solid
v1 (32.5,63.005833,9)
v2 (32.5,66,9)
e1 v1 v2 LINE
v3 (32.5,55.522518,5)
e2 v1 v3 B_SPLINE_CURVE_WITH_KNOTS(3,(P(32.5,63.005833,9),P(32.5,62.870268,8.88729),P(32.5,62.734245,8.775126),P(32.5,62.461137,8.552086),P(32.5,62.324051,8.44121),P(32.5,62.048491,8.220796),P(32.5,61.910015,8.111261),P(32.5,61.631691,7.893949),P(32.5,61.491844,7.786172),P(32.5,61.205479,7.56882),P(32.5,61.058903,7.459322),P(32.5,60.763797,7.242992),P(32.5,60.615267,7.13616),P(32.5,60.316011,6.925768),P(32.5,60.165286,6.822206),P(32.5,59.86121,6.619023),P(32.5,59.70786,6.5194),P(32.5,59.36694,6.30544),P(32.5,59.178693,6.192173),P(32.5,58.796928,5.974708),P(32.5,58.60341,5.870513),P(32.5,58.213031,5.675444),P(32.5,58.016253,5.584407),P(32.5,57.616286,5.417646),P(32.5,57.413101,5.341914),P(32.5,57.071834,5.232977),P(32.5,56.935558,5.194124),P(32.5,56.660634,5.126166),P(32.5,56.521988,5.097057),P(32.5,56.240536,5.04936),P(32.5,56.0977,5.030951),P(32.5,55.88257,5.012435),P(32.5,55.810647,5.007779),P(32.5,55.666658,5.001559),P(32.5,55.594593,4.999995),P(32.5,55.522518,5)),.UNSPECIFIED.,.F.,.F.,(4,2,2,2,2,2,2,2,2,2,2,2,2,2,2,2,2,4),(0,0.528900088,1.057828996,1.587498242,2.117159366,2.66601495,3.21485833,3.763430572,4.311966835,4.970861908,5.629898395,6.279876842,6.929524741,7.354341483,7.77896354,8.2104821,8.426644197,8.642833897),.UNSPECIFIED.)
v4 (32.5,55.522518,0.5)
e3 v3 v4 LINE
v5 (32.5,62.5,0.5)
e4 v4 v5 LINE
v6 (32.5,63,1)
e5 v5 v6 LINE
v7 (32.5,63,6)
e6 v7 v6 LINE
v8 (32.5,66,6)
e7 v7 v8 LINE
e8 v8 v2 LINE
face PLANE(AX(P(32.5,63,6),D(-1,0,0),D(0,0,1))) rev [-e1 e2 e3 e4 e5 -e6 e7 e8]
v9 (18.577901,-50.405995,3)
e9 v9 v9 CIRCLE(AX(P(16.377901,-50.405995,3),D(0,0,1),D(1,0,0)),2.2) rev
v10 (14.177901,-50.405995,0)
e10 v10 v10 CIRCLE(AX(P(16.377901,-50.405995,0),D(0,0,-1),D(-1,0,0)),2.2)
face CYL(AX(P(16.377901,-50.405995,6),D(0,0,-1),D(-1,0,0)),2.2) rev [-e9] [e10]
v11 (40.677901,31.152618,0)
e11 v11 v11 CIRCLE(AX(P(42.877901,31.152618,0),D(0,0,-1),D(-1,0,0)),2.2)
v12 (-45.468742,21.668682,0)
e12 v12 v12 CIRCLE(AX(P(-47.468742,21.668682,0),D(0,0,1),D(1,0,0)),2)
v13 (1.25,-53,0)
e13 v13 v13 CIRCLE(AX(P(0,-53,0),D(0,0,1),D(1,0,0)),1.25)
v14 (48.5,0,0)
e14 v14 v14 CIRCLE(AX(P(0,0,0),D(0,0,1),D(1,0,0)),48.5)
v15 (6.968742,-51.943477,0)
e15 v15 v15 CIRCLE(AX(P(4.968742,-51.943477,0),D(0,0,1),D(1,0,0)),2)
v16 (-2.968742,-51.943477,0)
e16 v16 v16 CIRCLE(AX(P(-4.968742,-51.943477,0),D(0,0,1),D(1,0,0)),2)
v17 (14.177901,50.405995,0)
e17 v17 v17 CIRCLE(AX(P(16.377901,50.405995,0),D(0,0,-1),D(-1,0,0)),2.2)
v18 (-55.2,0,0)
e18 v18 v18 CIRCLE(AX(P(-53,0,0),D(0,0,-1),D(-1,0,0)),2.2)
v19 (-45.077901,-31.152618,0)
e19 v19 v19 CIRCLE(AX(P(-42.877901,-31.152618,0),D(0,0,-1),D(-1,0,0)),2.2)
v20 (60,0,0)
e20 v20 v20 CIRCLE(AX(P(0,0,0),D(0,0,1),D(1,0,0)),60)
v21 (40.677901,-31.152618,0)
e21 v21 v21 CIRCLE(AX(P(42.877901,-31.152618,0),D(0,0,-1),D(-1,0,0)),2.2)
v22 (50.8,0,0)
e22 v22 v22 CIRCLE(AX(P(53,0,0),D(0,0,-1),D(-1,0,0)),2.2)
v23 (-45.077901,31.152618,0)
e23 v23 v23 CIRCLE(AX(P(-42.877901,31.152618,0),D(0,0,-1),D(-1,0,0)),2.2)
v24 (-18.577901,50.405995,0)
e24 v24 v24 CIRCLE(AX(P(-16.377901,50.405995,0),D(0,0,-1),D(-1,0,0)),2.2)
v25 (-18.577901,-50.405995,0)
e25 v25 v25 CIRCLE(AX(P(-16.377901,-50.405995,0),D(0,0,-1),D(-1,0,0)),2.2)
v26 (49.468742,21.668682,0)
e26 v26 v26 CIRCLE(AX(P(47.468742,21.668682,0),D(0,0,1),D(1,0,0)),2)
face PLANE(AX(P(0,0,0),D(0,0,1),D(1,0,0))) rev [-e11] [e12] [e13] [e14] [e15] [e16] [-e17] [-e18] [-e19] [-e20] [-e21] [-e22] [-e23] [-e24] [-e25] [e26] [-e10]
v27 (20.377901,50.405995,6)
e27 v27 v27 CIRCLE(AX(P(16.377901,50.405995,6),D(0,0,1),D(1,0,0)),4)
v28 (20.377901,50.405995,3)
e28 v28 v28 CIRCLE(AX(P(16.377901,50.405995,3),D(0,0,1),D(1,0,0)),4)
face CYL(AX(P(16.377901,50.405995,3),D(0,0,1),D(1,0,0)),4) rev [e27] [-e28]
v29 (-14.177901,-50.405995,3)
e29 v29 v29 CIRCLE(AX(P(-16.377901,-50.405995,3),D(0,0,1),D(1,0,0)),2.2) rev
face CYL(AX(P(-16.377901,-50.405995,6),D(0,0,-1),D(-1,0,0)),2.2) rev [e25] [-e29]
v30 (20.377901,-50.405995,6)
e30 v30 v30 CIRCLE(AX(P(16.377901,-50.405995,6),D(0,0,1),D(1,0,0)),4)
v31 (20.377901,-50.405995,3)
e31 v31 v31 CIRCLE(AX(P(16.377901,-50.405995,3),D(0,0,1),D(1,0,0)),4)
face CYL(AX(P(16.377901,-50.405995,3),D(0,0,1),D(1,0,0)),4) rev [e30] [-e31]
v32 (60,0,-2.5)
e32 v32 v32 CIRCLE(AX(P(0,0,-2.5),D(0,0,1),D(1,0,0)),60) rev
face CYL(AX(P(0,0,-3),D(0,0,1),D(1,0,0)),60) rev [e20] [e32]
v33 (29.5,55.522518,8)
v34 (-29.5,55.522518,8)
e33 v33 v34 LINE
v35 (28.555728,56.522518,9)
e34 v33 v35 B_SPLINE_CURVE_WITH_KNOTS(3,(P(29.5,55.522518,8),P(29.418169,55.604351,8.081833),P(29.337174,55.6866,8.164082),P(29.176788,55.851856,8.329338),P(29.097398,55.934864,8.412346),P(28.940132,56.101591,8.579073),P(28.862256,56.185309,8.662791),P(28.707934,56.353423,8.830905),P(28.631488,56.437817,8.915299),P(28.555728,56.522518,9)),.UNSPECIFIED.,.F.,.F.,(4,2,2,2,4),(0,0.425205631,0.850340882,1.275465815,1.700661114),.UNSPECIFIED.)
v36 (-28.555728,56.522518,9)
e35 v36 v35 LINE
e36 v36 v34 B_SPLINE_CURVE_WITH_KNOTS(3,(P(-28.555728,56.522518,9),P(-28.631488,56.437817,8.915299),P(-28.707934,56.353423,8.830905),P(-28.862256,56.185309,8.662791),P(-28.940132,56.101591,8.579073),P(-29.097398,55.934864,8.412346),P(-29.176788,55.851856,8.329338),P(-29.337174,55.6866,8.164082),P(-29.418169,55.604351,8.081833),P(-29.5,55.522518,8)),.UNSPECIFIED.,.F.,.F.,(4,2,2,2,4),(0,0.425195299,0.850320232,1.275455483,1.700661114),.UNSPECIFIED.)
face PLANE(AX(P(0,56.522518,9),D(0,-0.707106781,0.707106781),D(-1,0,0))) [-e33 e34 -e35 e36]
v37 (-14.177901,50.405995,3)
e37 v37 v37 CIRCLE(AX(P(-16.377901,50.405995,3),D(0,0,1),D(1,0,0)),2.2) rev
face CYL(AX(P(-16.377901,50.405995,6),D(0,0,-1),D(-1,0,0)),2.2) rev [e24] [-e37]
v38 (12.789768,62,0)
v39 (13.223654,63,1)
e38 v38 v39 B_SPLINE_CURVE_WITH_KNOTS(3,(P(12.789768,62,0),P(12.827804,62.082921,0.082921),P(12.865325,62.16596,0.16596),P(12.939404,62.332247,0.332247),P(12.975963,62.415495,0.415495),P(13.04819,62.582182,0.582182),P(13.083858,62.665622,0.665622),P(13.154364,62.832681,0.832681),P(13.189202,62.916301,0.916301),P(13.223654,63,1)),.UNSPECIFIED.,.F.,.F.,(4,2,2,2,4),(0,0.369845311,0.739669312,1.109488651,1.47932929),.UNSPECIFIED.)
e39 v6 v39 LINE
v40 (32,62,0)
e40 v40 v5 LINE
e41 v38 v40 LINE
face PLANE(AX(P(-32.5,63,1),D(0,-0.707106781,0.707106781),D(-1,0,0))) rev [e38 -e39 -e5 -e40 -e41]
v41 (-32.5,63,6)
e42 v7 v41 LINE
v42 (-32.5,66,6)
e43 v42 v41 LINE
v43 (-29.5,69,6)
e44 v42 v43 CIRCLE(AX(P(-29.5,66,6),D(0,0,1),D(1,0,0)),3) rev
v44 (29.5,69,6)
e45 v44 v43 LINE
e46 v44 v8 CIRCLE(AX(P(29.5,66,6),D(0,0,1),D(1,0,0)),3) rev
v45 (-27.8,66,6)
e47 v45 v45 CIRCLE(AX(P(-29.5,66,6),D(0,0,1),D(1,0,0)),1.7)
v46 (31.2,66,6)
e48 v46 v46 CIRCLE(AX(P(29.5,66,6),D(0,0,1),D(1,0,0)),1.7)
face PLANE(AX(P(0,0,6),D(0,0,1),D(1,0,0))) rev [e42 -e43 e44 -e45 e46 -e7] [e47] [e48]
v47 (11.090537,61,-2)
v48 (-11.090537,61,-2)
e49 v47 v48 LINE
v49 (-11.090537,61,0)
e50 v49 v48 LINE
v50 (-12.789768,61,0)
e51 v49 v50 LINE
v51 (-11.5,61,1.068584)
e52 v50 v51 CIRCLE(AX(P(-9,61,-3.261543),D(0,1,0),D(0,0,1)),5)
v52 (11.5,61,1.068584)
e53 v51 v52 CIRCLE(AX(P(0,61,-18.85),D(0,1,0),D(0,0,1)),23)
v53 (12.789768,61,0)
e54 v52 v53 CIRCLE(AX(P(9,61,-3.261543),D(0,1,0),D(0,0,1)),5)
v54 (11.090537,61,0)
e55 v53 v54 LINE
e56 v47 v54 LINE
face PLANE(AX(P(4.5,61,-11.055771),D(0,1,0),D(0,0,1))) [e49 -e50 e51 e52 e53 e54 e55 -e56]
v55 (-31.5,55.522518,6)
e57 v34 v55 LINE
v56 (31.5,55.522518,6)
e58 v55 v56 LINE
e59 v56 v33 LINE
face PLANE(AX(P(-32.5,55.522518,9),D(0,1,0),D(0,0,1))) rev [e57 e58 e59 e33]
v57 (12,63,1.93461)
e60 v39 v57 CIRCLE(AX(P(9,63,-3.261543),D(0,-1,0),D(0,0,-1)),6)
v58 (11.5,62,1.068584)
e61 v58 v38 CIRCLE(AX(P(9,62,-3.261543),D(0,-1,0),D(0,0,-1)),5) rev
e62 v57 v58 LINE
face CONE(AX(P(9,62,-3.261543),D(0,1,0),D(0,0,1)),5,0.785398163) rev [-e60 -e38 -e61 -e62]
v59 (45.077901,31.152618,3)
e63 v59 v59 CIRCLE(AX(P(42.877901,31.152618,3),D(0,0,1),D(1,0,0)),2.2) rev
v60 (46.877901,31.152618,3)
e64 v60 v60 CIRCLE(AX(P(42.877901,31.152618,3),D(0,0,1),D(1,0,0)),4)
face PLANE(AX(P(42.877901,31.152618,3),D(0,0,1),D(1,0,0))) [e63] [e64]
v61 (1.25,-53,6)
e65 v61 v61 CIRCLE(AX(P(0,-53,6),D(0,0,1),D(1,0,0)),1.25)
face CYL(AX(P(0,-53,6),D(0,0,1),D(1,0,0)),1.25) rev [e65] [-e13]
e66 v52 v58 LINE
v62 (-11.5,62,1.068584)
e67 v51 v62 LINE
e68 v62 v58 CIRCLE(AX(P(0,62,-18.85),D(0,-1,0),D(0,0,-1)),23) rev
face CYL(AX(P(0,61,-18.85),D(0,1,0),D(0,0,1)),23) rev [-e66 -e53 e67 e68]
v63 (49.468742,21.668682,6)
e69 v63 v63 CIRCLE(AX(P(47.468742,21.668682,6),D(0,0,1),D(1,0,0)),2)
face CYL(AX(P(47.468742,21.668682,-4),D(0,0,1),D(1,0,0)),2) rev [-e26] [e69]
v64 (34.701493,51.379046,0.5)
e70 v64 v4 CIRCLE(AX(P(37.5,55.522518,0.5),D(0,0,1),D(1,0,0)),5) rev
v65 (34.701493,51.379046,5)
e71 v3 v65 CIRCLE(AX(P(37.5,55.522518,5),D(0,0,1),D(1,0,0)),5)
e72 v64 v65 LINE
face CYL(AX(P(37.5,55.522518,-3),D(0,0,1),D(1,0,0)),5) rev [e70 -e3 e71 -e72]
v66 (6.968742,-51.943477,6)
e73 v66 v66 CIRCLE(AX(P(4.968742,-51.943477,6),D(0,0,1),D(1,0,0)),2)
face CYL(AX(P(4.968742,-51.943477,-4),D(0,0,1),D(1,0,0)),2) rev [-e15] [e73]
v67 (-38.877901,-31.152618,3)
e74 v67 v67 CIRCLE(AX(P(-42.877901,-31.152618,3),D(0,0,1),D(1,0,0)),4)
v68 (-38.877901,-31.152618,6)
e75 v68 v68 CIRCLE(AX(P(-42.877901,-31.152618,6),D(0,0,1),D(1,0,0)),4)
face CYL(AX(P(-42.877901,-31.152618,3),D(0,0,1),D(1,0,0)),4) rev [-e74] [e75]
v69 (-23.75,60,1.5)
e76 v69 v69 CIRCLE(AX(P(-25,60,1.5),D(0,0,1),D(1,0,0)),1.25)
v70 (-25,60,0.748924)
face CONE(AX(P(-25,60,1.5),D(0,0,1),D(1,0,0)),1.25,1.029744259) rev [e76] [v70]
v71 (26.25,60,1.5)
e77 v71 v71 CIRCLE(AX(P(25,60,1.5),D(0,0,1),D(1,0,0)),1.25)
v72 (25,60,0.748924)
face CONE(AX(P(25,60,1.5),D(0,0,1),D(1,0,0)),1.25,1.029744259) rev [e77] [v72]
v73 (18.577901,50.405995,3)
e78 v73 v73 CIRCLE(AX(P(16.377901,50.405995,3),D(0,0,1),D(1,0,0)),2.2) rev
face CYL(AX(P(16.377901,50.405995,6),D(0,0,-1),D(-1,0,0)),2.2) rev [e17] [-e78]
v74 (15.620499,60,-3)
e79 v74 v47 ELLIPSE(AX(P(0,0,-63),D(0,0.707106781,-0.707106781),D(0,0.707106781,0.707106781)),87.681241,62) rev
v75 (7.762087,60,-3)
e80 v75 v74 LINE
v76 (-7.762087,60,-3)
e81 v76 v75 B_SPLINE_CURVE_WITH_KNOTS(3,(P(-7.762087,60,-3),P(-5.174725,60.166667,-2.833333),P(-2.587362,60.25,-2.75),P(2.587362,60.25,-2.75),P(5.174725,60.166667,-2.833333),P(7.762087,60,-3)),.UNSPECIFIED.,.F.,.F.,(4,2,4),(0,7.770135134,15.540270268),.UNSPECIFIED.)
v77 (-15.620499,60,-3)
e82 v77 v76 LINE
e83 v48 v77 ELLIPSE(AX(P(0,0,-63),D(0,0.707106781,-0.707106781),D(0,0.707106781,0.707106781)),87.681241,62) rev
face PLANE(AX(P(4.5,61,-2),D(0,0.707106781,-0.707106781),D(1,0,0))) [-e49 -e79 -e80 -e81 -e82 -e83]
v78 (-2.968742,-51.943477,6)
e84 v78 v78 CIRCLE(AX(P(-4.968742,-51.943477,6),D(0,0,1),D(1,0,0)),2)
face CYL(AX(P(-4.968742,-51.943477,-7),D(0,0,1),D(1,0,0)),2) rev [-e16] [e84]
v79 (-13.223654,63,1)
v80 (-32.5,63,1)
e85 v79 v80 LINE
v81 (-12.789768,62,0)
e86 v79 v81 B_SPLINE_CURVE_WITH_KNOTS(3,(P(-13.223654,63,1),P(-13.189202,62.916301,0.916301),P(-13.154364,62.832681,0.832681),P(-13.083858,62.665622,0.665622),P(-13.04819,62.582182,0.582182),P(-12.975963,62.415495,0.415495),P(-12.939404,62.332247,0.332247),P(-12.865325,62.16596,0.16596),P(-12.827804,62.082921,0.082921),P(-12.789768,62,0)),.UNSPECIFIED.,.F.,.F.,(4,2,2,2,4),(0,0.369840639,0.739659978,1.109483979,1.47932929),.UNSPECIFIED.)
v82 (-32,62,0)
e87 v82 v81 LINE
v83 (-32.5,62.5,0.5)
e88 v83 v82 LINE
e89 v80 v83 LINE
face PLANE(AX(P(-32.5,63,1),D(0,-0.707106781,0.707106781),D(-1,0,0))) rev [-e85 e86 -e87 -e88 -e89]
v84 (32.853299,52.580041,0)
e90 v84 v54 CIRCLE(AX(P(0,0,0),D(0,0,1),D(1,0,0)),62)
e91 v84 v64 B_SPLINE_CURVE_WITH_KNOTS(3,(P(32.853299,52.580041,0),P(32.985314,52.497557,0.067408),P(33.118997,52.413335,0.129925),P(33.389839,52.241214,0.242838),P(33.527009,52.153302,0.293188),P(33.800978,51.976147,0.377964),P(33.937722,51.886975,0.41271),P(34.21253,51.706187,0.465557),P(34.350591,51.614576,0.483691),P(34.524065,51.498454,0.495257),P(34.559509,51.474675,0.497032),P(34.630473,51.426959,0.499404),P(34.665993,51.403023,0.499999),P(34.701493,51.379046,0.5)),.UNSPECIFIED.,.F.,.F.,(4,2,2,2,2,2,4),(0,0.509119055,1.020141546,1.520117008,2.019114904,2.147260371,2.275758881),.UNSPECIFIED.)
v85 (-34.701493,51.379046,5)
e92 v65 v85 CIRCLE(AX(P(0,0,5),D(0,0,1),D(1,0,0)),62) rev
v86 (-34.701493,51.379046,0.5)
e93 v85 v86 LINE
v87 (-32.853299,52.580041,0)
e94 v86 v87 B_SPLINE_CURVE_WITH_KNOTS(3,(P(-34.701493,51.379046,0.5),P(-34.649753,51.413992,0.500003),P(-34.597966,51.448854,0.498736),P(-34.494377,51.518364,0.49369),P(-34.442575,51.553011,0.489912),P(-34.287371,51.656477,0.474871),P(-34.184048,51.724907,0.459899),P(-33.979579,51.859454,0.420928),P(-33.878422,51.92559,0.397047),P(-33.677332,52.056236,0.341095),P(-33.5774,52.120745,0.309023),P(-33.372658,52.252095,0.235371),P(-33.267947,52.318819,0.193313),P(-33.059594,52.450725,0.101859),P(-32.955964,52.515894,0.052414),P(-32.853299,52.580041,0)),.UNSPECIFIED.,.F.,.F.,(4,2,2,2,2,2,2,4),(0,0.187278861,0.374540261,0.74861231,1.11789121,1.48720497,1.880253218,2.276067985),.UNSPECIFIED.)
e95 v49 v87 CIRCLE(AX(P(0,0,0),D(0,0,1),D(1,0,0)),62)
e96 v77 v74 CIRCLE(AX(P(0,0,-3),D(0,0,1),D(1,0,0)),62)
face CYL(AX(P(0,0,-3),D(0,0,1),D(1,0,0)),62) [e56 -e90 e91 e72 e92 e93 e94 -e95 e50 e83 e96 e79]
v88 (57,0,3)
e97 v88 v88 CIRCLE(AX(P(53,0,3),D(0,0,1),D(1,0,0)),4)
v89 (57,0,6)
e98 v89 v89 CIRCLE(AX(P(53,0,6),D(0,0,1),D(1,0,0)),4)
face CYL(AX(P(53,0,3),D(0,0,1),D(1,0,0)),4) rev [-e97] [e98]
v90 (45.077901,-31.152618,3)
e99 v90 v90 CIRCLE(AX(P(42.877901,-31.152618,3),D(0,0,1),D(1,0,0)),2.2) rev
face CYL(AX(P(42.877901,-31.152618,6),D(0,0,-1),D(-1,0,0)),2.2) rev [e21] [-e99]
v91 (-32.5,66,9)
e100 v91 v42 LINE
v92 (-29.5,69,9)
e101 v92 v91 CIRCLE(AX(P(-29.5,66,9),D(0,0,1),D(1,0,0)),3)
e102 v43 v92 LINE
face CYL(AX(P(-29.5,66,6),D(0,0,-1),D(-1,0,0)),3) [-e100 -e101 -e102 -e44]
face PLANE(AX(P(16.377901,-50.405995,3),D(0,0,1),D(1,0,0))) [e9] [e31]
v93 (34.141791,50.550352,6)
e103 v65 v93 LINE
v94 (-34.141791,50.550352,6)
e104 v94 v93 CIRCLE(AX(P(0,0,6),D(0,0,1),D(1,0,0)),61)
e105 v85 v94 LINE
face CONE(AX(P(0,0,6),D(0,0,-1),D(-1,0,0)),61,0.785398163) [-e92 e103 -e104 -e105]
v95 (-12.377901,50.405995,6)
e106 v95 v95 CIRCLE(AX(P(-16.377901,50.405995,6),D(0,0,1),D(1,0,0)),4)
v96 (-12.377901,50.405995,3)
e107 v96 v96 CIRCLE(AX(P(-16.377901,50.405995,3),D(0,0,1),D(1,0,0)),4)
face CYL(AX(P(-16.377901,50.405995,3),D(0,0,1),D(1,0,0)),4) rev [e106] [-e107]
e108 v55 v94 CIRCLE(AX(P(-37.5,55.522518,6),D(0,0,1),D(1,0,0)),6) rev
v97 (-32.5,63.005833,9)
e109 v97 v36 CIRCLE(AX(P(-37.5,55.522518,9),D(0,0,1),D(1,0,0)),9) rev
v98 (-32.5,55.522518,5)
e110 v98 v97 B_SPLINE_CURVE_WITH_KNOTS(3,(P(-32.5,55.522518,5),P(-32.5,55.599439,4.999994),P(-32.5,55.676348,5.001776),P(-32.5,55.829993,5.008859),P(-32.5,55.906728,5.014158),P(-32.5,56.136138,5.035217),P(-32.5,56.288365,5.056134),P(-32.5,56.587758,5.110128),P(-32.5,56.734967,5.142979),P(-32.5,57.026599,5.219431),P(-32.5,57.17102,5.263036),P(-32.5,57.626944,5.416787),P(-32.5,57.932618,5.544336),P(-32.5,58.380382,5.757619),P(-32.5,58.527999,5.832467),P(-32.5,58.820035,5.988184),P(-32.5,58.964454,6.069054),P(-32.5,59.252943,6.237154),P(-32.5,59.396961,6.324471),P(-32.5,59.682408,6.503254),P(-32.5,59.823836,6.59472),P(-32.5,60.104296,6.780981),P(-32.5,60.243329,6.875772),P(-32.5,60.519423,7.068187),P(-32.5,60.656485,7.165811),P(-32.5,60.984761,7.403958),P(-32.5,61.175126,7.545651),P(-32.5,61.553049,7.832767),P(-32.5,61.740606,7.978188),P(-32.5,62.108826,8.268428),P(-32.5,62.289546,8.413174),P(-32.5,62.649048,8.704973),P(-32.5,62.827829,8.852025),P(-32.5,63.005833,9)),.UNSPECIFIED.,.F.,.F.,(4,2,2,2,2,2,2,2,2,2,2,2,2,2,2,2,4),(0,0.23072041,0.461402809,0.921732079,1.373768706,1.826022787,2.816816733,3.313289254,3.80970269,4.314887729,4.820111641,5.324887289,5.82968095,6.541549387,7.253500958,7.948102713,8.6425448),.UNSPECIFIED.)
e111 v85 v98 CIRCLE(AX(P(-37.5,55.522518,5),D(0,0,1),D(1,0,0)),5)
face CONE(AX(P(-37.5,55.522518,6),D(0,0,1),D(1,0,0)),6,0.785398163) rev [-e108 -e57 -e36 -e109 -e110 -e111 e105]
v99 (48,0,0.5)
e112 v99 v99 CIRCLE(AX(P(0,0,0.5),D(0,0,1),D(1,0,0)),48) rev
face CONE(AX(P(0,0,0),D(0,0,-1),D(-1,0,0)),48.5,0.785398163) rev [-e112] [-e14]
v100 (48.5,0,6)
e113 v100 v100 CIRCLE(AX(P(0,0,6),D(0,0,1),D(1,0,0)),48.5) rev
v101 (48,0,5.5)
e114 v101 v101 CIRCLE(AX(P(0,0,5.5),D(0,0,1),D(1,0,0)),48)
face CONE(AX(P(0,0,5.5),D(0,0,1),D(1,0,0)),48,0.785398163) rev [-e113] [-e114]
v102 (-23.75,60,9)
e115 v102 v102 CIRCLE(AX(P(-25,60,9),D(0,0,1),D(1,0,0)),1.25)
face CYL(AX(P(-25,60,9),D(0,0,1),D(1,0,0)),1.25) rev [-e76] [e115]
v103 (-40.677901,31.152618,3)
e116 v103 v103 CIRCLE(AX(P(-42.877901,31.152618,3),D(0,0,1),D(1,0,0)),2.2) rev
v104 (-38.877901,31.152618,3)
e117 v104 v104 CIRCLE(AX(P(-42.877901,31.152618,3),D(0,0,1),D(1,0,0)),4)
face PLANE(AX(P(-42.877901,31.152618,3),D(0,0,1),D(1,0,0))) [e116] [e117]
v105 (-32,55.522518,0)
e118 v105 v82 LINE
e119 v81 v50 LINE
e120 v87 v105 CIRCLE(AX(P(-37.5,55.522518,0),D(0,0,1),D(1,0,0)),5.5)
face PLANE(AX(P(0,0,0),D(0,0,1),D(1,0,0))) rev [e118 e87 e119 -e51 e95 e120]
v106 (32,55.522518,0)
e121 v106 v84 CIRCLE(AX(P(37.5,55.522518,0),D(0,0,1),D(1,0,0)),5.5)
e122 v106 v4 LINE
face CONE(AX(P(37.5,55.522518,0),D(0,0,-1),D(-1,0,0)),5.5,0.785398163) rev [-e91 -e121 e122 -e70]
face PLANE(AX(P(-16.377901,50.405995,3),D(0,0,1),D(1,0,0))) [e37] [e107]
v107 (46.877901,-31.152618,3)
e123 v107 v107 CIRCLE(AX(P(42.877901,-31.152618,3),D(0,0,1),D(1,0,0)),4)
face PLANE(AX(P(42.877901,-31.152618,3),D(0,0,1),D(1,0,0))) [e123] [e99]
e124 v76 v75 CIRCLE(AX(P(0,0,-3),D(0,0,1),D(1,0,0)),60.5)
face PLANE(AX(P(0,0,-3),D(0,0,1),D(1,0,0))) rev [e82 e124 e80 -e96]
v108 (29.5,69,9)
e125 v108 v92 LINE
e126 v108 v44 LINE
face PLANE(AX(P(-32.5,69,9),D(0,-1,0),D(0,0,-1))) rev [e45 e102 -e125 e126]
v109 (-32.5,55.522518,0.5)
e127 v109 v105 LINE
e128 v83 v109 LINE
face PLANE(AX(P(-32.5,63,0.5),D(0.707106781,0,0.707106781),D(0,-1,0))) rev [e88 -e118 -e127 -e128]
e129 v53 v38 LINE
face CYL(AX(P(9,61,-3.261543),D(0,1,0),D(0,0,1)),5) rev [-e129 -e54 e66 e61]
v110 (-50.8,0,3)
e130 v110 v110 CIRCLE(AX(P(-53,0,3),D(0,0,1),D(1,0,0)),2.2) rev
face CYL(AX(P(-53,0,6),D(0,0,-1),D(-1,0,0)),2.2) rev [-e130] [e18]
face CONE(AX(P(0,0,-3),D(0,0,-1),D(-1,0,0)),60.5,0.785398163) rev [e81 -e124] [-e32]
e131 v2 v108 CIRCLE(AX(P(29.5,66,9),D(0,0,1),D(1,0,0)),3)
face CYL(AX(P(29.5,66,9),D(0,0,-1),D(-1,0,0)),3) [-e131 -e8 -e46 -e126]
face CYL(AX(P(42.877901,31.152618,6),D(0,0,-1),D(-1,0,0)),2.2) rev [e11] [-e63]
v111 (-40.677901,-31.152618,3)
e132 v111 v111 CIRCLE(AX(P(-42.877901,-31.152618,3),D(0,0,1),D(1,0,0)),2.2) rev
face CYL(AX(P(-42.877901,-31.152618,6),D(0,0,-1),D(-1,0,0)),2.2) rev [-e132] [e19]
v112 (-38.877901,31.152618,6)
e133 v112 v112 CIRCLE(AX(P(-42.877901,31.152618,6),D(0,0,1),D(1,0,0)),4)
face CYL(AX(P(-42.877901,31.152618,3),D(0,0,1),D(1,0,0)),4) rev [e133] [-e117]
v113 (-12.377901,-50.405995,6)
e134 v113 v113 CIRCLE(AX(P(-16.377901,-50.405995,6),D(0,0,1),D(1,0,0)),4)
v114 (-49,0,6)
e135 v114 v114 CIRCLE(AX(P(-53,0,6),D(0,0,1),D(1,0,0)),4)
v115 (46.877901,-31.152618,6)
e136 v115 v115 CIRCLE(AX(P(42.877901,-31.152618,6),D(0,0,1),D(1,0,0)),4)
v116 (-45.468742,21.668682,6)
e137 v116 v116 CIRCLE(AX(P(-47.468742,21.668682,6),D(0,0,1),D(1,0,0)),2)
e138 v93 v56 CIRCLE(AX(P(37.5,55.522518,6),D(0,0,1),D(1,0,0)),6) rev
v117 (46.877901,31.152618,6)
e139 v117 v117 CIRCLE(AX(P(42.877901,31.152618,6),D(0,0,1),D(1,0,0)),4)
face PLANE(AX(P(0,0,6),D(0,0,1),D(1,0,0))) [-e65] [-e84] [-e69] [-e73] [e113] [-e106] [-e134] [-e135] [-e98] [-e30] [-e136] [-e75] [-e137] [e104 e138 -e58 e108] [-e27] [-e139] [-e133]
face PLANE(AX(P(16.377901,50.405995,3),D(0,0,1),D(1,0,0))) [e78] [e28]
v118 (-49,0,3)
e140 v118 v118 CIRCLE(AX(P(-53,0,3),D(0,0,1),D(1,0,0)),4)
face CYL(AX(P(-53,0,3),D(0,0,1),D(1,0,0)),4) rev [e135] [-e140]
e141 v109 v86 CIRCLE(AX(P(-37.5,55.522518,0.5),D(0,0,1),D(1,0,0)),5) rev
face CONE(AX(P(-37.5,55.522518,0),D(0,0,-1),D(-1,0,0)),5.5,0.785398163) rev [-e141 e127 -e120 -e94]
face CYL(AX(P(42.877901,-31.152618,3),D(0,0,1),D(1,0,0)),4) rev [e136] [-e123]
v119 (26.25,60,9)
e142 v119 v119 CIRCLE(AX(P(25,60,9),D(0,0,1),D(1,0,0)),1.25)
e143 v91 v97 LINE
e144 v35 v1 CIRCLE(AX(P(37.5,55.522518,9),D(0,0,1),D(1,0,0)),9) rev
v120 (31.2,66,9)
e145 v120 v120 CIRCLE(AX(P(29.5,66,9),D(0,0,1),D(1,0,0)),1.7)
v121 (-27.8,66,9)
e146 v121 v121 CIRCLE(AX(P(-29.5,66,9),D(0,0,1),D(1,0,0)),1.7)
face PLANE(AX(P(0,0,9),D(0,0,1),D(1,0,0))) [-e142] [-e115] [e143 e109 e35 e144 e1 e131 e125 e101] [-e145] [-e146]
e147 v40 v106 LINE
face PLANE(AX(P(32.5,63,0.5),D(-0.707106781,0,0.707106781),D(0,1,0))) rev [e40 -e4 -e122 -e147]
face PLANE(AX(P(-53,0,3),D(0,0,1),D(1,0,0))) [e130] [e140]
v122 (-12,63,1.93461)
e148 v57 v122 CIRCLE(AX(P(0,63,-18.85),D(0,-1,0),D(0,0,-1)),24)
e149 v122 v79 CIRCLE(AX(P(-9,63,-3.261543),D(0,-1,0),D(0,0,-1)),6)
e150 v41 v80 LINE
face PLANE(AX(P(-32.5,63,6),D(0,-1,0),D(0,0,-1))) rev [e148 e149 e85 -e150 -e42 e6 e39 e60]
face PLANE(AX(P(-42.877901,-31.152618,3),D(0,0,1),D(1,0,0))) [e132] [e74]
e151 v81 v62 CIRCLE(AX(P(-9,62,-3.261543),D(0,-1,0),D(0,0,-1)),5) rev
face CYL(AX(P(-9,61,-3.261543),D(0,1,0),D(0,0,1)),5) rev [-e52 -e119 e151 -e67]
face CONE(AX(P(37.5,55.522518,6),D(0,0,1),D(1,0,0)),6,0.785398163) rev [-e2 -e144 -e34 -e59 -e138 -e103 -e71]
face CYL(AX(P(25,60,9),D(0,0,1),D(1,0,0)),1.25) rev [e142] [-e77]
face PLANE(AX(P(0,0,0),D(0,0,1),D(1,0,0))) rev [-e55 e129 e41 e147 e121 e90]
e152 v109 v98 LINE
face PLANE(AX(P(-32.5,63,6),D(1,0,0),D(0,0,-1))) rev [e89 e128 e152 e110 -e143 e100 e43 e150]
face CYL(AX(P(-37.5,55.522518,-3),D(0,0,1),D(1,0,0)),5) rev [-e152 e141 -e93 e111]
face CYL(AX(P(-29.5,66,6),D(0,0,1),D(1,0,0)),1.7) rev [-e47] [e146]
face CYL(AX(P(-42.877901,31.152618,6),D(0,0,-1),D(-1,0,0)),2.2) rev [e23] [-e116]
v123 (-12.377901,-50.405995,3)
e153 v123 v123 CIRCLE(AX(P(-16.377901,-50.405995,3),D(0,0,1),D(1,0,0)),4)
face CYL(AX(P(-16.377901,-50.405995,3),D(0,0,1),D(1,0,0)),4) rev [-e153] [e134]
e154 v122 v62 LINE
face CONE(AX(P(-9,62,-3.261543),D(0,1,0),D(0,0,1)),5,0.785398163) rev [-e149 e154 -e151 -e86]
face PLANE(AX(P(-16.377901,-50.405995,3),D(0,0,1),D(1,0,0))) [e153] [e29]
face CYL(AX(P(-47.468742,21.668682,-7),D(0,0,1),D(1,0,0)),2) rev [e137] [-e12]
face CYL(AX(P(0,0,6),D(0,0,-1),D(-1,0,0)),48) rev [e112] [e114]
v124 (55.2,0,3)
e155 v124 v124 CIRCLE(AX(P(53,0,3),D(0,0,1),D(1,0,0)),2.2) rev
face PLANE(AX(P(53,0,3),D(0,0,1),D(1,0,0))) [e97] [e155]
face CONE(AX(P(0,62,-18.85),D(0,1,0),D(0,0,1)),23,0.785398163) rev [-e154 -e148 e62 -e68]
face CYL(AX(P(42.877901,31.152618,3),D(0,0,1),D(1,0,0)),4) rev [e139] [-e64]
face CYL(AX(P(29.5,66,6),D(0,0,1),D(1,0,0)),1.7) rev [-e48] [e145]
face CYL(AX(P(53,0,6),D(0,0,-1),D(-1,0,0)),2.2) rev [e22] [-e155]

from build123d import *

# Parameters (mm, degrees)
SKETCH_1_R             = 62
SKETCH_1_R_2           = 60
EXTRUDE_1_DEPTH        = 3
EXTRUDE_START          = 6
SKETCH_2_R             = 48
EXTRUDE_2_DEPTH        = 6
FILLET_1_R             = 5
CHAMFER_1_SIZE         = 0.5
CHAMFER_2_SIZE         = 0.5
SKETCH_6_R             = 2.2
CUT_EXTRUDE_1_DEPTH    = 6
SKETCH_7_W             = 65
SKETCH_7_H             = 13.477482046
EXTRUDE_3_DEPTH        = 3
SKETCH_11_R            = 1.7
CUT_EXTRUDE_2_DEPTH    = 3
CHAMFER_3_SIZE         = 1
CHAMFER_4_SIZE         = 1
FILLET_2_R             = 3
CHAMFER_5_3_ANGLE      = 291.929687
SKETCH_12_R            = 4
CUT_EXTRUDE_3_DEPTH    = 3
CUT_EXTRUDE_4_DEPTH    = 2
CHAMFER_6_SIZE         = 1
HOLE_WIZARD_M3_1_D     = 2.5
HOLE_WIZARD_M3_1_DEPTH = 7.5
HOLE_WIZARD_M3_1_TIP   = 0.751075774
HOLE_WIZARD_M3_2_D     = 2.5
HOLE_WIZARD_M3_2_DEPTH = 7.5
HOLE_WIZARD_M3_2_TIP   = 0.751075774
SKETCH_21_R            = 2
CUT_EXTRUDE_5_DEPTH    = 13
SKETCH_22_R            = 2
CUT_EXTRUDE_6_DEPTH    = 13
SKETCH_25_R            = 2
CUT_EXTRUDE_8_DEPTH    = 10


with BuildPart() as part:
    # 草图1 → 凸台-拉伸1 (new body)
    with BuildSketch(Plane.XY):
        Circle(SKETCH_1_R)
        Circle(SKETCH_1_R_2, mode=Mode.SUBTRACT)
    extrude(amount=-EXTRUDE_1_DEPTH)

    # 草图2 → 凸台-拉伸2 (add)
    with BuildSketch(Plane.XY.offset(EXTRUDE_START)):
        with BuildLine():
            Line((-32.5, 63), (32.5, 63))
            Line((32.5, 63), (32.5, 52.79914772))
            ThreePointArc((32.5, 52.79914772), (0, -62), (-32.5, 52.79914772))
            Line((-32.5, 52.79914772), (-32.5, 63))
        make_face()
        Circle(SKETCH_2_R, mode=Mode.SUBTRACT)
    extrude(amount=-EXTRUDE_2_DEPTH)

    # 圆角1
    # the kernel refuses this fillet: 5 mm, written as the material it adds along each edge
    with BuildSketch(Plane(origin=(32.5, 52.79914772, 6), x_dir=(0.8403342947446245, -0.5420685132675156, 0), z_dir=(0, 0, -1))) as fillet_1_piece_1:
        with BuildLine():
            CenterArc((2.72541822, -4.998883971), FILLET_1_R, 91.210593649, 55.964843523)
            Line((-1.476253254, -2.288541405), (0, 0))
            ThreePointArc((0, 0), (1.309890927, -0.013838756), (2.619781855, 0))
        make_face()
    extrude(amount=6)
    with BuildSketch(Plane(origin=(-32.5, 52.79914772, 6), x_dir=(-0.840334294744627, -0.5420685132675117, 0), z_dir=(0, 0, -1))) as fillet_1_piece_2:
        with BuildLine():
            CenterArc((2.72541822, 4.998883971), FILLET_1_R, 212.824562828, 55.964843523)
            Line((-1.476253254, 2.288541405), (0, 0))
            ThreePointArc((0, 0), (1.309890927, 0.013838756), (2.619781855, 0))
        make_face()
    extrude(amount=6)

    # 倒角1
    chamfer_1_edges = [part.edges().sort_by_distance(p)[0] for p in [
        (-48, 0, 0),
        (-48, 0, 6),
        (-60, 0, -3),
    ]]
    chamfer(chamfer_1_edges, length=CHAMFER_1_SIZE)

    # 倒角2
    # the kernel refuses this chamfer: 0.5 mm, written as the material it takes off along each edge
    with BuildSketch(Plane(origin=(-32.5, 55.522517954, 0), x_dir=(0, 0, 1), z_dir=(0, 1, 0)), Plane(origin=(32.5, 64.285841494, 0), x_dir=(0, 0, 1), z_dir=(0, -1, 0))) as chamfer_2_piece_1:
        Polygon((CHAMFER_2_SIZE, 0), (0, CHAMFER_2_SIZE), (0, 0), align=None)
    extrude(amount=8.76332354, mode=Mode.SUBTRACT)
    with BuildSketch(Plane(origin=(37.5, 55.522517954, 0), x_dir=(-0.15613015555825177, -0.9877364904291813, 0), z_dir=(0.9877364904291813, -0.15613015555825177, 0))) as chamfer_2_piece_2_section:
        Polygon((5, -CHAMFER_2_SIZE), (5 + CHAMFER_2_SIZE, 0), (5, 0), align=None)
    chamfer_2_piece_2 = revolve(axis=Axis((37.5, 55.522517954, 0), (0, 0, -1)), revolution_arc=81.017652556, mode=Mode.PRIVATE)
    chamfer_2_piece_2 = chamfer_2_piece_2 - Plane(origin=(0, 0, 0), x_dir=(1, 0, 0), z_dir=(0, 0, 1)) * Cylinder(62, 22, mode=Mode.PRIVATE)
    add(chamfer_2_piece_2, mode=Mode.SUBTRACT)
    with BuildSketch(Plane(origin=(-37.5, 55.522517954, 0), x_dir=(1, 0, 0), z_dir=(0, 1, 0))) as chamfer_2_piece_3_section:
        Polygon((5, -CHAMFER_2_SIZE), (5 + CHAMFER_2_SIZE, 0), (5, 0), align=None)
    chamfer_2_piece_3 = revolve(axis=Axis((-37.5, 55.522517954, 0), (0, 0, -1)), revolution_arc=81.017652556, mode=Mode.PRIVATE)
    chamfer_2_piece_3 = chamfer_2_piece_3 - Plane(origin=(0, 0, 0), x_dir=(1, 0, 0), z_dir=(0, 0, 1)) * Cylinder(62, 22, mode=Mode.PRIVATE)
    add(chamfer_2_piece_3, mode=Mode.SUBTRACT)

    # 草图6 → 切除-拉伸1 (cut)
    with BuildSketch(Plane(origin=(0, 0, 0), x_dir=(-1, 0, 0), z_dir=(0, 0, -1))):
        with Locations((-42.877900702, 31.152618372)):
            Circle(SKETCH_6_R)
        with Locations((-53, 0)):
            Circle(SKETCH_6_R)
        with Locations((-42.877900702, -31.152618371)):
            Circle(SKETCH_6_R)
        with Locations((-16.377900702, -50.405995364)):
            Circle(SKETCH_6_R)
        with Locations((16.377900702, -50.405995364)):
            Circle(SKETCH_6_R)
        with Locations((42.877900702, -31.152618371)):
            Circle(SKETCH_6_R)
        with Locations((53, 0)):
            Circle(SKETCH_6_R)
        with Locations((42.877900702, 31.152618372)):
            Circle(SKETCH_6_R)
        with Locations((16.377900702, 50.405995364)):
            Circle(SKETCH_6_R)
        with Locations((-16.377900702, 50.405995364)):
            Circle(SKETCH_6_R)
    extrude(amount=-CUT_EXTRUDE_1_DEPTH, mode=Mode.SUBTRACT)

    # 草图7 → 凸台-拉伸3 (add)
    with BuildSketch(Plane.XY.offset(6)):
        with Locations((0, 62.261258977)):
            Rectangle(SKETCH_7_W, SKETCH_7_H)
    extrude(amount=EXTRUDE_3_DEPTH)

    # 草图11 → 切除-拉伸2 (cut)
    with BuildSketch(Plane.XY.offset(9)):
        with Locations((-29.5, 66)):
            Circle(SKETCH_11_R)
        with Locations((29.5, 66)):
            Circle(SKETCH_11_R)
    extrude(amount=-CUT_EXTRUDE_2_DEPTH, mode=Mode.SUBTRACT)

    # 倒角3
    chamfer_3_edges = [part.edges().sort_by_distance(p)[0] for p in [
        (0, 63, 0),
    ]]
    chamfer(chamfer_3_edges, length=CHAMFER_3_SIZE - 0.0001)  # a hair under: the kernel refuses the full size

    # 倒角4
    chamfer_4_edges = [part.edges().sort_by_distance(p)[0] for p in [
        (0, 55.522517954, 9),
    ]]
    chamfer(chamfer_4_edges, length=CHAMFER_4_SIZE)

    # 圆角2
    fillet_2_edges = [part.edges().sort_by_distance(p)[0] for p in [
        (-32.5, 69, 7.5),
        (32.5, 69, 7.5),
    ]]
    fillet(fillet_2_edges, radius=FILLET_2_R)

    # 倒角5: read off the stored shape, not the designer's step
    # 倒角5 outline → 倒角5 (revolve, cut)
    with BuildSketch(Plane(origin=(37.5, 55.522517954, 0), x_dir=(1, 0, 0), z_dir=(0, -1, 0))):
        Polygon((4.999998721, 9), (4.999998721, 4.999998721), (9, 9), align=None)
    revolve(axis=Axis((37.5, 55.522517954, 0), (0, 0, 1)), mode=Mode.SUBTRACT)

    # Chamfer 5 2 outline → Chamfer 5 2 (revolve, cut)
    with BuildSketch(Plane(origin=(-37.5, 55.522517954, 0), x_dir=(1, 0, 0), z_dir=(0, -1, 0))):
        Polygon((4.99999762, 9), (4.99999762, 4.99999762), (9, 9), align=None)
    revolve(axis=Axis((-37.5, 55.522517954, 0), (0, 0, 1)), mode=Mode.SUBTRACT)

    # Chamfer 5 3 outline → Chamfer 5 3 (revolve, cut)
    with BuildSketch(Plane(origin=(0, 0, 0), x_dir=(-0.5597014925373135, 0.8286942978273132, 0), z_dir=(0.8286942978273132, 0.5597014925373135, 0))):
        Polygon((62, 6), (61, 6), (62, 5), align=None)
    revolve(axis=Axis((0, 0, 0), (0, 0, 1)), revolution_arc=CHAMFER_5_3_ANGLE, mode=Mode.SUBTRACT)

    # 草图12 → 切除-拉伸3 (cut)
    with BuildSketch(Plane.XY.offset(6)):
        with Locations((-16.377900702, 50.405995364)):
            Circle(SKETCH_12_R)
        with Locations((16.377900702, 50.405995364)):
            Circle(SKETCH_12_R)
        with Locations((42.877900702, 31.152618372)):
            Circle(SKETCH_12_R)
        with Locations((53, 0)):
            Circle(SKETCH_12_R)
        with Locations((42.877900702, -31.152618371)):
            Circle(SKETCH_12_R)
        with Locations((16.377900702, -50.405995364)):
            Circle(SKETCH_12_R)
        with Locations((-16.377900702, -50.405995364)):
            Circle(SKETCH_12_R)
        with Locations((-42.877900702, -31.152618371)):
            Circle(SKETCH_12_R)
        with Locations((-53, 0)):
            Circle(SKETCH_12_R)
        with Locations((-42.877900702, 31.152618372)):
            Circle(SKETCH_12_R)
    extrude(amount=-CUT_EXTRUDE_3_DEPTH, mode=Mode.SUBTRACT)

    # 草图14 → 切除-拉伸4 (cut)
    with BuildSketch(Plane(origin=(0, 63, 0), x_dir=(1, 0, 0), z_dir=(0, 1, 0))):
        with BuildLine():
            ThreePointArc((-4.030108666, 3.809429698), (-11.733833556, 7.447967709), (-11.5, -1.068584287))
            ThreePointArc((-11.5, -1.068584287), (0, -4.15), (11.5, -1.068584287))
            ThreePointArc((11.5, -1.068584287), (11.733833556, 7.447967709), (4.030108666, 3.809429698))
            ThreePointArc((4.030108666, 3.809429698), (0, 5.85), (-4.030108666, 3.809429698))
        make_face()
    extrude(amount=-CUT_EXTRUDE_4_DEPTH, mode=Mode.SUBTRACT)

    # 倒角6
    # the kernel refuses this chamfer: 1 mm, written as the material it takes off along each edge
    with BuildSketch(Plane(origin=(18.80558547, 61, -3), x_dir=(0, -1, 0), z_dir=(-1, 0, 0))) as chamfer_6_piece_1:
        Polygon((CHAMFER_6_SIZE, 0), (0, CHAMFER_6_SIZE), (0, 0), align=None)
    extrude(amount=37.61117094, mode=Mode.SUBTRACT)
    with BuildSketch(Plane(origin=(-9, 63, -3.261542732), x_dir=(-0.874686173337968, 0, 0.48468969266055384), z_dir=(-0.48468969266055384, 0, -0.874686173337968))) as chamfer_6_piece_2:
        Polygon((5, -CHAMFER_6_SIZE), (5 + CHAMFER_6_SIZE, 0), (5, 0), align=None)
    revolve(axis=Axis((-9, 63, -3.261542732), (0, 1, 0)), revolution_arc=31.007856081, mode=Mode.SUBTRACT)
    with BuildSketch(Plane(origin=(9, 63, -3.261542732), x_dir=(0.49999999999998873, 0, 0.8660254037844451), z_dir=(-0.8660254037844451, 0, 0.49999999999998873))) as chamfer_6_piece_3:
        Polygon((5, -CHAMFER_6_SIZE), (5 + CHAMFER_6_SIZE, 0), (5, 0), align=None)
    revolve(axis=Axis((9, 63, -3.261542732), (0, 1, 0)), revolution_arc=31.007856081, mode=Mode.SUBTRACT)
    with BuildSketch(Plane(origin=(0, 63, -18.85), x_dir=(-0.500000000000001, 0, 0.8660254037844382), z_dir=(-0.8660254037844382, 0, -0.500000000000001))) as chamfer_6_piece_4:
        Polygon((23, -CHAMFER_6_SIZE), (23 + CHAMFER_6_SIZE, 0), (23, 0), align=None)
    revolve(axis=Axis((0, 63, -18.85), (0, 1, 0)), revolution_arc=60, mode=Mode.SUBTRACT)

    # M3 螺纹孔1
    with Locations(Plane.XY.offset(9)):
        with Locations((-25, 60), (25, 60)):
            Hole(HOLE_WIZARD_M3_1_D / 2, depth=HOLE_WIZARD_M3_1_DEPTH)
            with Locations((0, 0, -(HOLE_WIZARD_M3_1_DEPTH + HOLE_WIZARD_M3_1_TIP / 2))):  # 118° drill point
                Cone(0, HOLE_WIZARD_M3_1_D / 2, HOLE_WIZARD_M3_1_TIP, mode=Mode.SUBTRACT)

    # M3 螺纹孔2
    with Locations(Plane.XY.offset(6)):
        with Locations((0, -53)):
            Hole(HOLE_WIZARD_M3_2_D / 2, depth=HOLE_WIZARD_M3_2_DEPTH)
            with Locations((0, 0, -(HOLE_WIZARD_M3_2_DEPTH + HOLE_WIZARD_M3_2_TIP / 2))):  # 118° drill point
                Cone(0, HOLE_WIZARD_M3_2_D / 2, HOLE_WIZARD_M3_2_TIP, mode=Mode.SUBTRACT)

    # 草图21 → 切除-拉伸5 (cut)
    with BuildSketch(Plane.XY.offset(6)):
        with Locations((-4.968742047, -51.94347744)):
            Circle(SKETCH_21_R)
    extrude(amount=-CUT_EXTRUDE_5_DEPTH, mode=Mode.SUBTRACT)

    # 草图22 → 切除-拉伸6 (cut)
    with BuildSketch(Plane.XY.offset(6)):
        with Locations((-47.468742054, 21.668681868)):
            Circle(SKETCH_22_R)
    extrude(amount=-CUT_EXTRUDE_6_DEPTH, mode=Mode.SUBTRACT)

    # 草图25 → 切除-拉伸8 (cut)
    with BuildSketch(Plane.XY.offset(6)):
        with Locations((47.468742054, 21.668681868)):
            Circle(SKETCH_25_R)
        with Locations((4.968742047, -51.94347744)):
            Circle(SKETCH_25_R)
    extrude(amount=-CUT_EXTRUDE_8_DEPTH, mode=Mode.SUBTRACT)


solid = part.part
